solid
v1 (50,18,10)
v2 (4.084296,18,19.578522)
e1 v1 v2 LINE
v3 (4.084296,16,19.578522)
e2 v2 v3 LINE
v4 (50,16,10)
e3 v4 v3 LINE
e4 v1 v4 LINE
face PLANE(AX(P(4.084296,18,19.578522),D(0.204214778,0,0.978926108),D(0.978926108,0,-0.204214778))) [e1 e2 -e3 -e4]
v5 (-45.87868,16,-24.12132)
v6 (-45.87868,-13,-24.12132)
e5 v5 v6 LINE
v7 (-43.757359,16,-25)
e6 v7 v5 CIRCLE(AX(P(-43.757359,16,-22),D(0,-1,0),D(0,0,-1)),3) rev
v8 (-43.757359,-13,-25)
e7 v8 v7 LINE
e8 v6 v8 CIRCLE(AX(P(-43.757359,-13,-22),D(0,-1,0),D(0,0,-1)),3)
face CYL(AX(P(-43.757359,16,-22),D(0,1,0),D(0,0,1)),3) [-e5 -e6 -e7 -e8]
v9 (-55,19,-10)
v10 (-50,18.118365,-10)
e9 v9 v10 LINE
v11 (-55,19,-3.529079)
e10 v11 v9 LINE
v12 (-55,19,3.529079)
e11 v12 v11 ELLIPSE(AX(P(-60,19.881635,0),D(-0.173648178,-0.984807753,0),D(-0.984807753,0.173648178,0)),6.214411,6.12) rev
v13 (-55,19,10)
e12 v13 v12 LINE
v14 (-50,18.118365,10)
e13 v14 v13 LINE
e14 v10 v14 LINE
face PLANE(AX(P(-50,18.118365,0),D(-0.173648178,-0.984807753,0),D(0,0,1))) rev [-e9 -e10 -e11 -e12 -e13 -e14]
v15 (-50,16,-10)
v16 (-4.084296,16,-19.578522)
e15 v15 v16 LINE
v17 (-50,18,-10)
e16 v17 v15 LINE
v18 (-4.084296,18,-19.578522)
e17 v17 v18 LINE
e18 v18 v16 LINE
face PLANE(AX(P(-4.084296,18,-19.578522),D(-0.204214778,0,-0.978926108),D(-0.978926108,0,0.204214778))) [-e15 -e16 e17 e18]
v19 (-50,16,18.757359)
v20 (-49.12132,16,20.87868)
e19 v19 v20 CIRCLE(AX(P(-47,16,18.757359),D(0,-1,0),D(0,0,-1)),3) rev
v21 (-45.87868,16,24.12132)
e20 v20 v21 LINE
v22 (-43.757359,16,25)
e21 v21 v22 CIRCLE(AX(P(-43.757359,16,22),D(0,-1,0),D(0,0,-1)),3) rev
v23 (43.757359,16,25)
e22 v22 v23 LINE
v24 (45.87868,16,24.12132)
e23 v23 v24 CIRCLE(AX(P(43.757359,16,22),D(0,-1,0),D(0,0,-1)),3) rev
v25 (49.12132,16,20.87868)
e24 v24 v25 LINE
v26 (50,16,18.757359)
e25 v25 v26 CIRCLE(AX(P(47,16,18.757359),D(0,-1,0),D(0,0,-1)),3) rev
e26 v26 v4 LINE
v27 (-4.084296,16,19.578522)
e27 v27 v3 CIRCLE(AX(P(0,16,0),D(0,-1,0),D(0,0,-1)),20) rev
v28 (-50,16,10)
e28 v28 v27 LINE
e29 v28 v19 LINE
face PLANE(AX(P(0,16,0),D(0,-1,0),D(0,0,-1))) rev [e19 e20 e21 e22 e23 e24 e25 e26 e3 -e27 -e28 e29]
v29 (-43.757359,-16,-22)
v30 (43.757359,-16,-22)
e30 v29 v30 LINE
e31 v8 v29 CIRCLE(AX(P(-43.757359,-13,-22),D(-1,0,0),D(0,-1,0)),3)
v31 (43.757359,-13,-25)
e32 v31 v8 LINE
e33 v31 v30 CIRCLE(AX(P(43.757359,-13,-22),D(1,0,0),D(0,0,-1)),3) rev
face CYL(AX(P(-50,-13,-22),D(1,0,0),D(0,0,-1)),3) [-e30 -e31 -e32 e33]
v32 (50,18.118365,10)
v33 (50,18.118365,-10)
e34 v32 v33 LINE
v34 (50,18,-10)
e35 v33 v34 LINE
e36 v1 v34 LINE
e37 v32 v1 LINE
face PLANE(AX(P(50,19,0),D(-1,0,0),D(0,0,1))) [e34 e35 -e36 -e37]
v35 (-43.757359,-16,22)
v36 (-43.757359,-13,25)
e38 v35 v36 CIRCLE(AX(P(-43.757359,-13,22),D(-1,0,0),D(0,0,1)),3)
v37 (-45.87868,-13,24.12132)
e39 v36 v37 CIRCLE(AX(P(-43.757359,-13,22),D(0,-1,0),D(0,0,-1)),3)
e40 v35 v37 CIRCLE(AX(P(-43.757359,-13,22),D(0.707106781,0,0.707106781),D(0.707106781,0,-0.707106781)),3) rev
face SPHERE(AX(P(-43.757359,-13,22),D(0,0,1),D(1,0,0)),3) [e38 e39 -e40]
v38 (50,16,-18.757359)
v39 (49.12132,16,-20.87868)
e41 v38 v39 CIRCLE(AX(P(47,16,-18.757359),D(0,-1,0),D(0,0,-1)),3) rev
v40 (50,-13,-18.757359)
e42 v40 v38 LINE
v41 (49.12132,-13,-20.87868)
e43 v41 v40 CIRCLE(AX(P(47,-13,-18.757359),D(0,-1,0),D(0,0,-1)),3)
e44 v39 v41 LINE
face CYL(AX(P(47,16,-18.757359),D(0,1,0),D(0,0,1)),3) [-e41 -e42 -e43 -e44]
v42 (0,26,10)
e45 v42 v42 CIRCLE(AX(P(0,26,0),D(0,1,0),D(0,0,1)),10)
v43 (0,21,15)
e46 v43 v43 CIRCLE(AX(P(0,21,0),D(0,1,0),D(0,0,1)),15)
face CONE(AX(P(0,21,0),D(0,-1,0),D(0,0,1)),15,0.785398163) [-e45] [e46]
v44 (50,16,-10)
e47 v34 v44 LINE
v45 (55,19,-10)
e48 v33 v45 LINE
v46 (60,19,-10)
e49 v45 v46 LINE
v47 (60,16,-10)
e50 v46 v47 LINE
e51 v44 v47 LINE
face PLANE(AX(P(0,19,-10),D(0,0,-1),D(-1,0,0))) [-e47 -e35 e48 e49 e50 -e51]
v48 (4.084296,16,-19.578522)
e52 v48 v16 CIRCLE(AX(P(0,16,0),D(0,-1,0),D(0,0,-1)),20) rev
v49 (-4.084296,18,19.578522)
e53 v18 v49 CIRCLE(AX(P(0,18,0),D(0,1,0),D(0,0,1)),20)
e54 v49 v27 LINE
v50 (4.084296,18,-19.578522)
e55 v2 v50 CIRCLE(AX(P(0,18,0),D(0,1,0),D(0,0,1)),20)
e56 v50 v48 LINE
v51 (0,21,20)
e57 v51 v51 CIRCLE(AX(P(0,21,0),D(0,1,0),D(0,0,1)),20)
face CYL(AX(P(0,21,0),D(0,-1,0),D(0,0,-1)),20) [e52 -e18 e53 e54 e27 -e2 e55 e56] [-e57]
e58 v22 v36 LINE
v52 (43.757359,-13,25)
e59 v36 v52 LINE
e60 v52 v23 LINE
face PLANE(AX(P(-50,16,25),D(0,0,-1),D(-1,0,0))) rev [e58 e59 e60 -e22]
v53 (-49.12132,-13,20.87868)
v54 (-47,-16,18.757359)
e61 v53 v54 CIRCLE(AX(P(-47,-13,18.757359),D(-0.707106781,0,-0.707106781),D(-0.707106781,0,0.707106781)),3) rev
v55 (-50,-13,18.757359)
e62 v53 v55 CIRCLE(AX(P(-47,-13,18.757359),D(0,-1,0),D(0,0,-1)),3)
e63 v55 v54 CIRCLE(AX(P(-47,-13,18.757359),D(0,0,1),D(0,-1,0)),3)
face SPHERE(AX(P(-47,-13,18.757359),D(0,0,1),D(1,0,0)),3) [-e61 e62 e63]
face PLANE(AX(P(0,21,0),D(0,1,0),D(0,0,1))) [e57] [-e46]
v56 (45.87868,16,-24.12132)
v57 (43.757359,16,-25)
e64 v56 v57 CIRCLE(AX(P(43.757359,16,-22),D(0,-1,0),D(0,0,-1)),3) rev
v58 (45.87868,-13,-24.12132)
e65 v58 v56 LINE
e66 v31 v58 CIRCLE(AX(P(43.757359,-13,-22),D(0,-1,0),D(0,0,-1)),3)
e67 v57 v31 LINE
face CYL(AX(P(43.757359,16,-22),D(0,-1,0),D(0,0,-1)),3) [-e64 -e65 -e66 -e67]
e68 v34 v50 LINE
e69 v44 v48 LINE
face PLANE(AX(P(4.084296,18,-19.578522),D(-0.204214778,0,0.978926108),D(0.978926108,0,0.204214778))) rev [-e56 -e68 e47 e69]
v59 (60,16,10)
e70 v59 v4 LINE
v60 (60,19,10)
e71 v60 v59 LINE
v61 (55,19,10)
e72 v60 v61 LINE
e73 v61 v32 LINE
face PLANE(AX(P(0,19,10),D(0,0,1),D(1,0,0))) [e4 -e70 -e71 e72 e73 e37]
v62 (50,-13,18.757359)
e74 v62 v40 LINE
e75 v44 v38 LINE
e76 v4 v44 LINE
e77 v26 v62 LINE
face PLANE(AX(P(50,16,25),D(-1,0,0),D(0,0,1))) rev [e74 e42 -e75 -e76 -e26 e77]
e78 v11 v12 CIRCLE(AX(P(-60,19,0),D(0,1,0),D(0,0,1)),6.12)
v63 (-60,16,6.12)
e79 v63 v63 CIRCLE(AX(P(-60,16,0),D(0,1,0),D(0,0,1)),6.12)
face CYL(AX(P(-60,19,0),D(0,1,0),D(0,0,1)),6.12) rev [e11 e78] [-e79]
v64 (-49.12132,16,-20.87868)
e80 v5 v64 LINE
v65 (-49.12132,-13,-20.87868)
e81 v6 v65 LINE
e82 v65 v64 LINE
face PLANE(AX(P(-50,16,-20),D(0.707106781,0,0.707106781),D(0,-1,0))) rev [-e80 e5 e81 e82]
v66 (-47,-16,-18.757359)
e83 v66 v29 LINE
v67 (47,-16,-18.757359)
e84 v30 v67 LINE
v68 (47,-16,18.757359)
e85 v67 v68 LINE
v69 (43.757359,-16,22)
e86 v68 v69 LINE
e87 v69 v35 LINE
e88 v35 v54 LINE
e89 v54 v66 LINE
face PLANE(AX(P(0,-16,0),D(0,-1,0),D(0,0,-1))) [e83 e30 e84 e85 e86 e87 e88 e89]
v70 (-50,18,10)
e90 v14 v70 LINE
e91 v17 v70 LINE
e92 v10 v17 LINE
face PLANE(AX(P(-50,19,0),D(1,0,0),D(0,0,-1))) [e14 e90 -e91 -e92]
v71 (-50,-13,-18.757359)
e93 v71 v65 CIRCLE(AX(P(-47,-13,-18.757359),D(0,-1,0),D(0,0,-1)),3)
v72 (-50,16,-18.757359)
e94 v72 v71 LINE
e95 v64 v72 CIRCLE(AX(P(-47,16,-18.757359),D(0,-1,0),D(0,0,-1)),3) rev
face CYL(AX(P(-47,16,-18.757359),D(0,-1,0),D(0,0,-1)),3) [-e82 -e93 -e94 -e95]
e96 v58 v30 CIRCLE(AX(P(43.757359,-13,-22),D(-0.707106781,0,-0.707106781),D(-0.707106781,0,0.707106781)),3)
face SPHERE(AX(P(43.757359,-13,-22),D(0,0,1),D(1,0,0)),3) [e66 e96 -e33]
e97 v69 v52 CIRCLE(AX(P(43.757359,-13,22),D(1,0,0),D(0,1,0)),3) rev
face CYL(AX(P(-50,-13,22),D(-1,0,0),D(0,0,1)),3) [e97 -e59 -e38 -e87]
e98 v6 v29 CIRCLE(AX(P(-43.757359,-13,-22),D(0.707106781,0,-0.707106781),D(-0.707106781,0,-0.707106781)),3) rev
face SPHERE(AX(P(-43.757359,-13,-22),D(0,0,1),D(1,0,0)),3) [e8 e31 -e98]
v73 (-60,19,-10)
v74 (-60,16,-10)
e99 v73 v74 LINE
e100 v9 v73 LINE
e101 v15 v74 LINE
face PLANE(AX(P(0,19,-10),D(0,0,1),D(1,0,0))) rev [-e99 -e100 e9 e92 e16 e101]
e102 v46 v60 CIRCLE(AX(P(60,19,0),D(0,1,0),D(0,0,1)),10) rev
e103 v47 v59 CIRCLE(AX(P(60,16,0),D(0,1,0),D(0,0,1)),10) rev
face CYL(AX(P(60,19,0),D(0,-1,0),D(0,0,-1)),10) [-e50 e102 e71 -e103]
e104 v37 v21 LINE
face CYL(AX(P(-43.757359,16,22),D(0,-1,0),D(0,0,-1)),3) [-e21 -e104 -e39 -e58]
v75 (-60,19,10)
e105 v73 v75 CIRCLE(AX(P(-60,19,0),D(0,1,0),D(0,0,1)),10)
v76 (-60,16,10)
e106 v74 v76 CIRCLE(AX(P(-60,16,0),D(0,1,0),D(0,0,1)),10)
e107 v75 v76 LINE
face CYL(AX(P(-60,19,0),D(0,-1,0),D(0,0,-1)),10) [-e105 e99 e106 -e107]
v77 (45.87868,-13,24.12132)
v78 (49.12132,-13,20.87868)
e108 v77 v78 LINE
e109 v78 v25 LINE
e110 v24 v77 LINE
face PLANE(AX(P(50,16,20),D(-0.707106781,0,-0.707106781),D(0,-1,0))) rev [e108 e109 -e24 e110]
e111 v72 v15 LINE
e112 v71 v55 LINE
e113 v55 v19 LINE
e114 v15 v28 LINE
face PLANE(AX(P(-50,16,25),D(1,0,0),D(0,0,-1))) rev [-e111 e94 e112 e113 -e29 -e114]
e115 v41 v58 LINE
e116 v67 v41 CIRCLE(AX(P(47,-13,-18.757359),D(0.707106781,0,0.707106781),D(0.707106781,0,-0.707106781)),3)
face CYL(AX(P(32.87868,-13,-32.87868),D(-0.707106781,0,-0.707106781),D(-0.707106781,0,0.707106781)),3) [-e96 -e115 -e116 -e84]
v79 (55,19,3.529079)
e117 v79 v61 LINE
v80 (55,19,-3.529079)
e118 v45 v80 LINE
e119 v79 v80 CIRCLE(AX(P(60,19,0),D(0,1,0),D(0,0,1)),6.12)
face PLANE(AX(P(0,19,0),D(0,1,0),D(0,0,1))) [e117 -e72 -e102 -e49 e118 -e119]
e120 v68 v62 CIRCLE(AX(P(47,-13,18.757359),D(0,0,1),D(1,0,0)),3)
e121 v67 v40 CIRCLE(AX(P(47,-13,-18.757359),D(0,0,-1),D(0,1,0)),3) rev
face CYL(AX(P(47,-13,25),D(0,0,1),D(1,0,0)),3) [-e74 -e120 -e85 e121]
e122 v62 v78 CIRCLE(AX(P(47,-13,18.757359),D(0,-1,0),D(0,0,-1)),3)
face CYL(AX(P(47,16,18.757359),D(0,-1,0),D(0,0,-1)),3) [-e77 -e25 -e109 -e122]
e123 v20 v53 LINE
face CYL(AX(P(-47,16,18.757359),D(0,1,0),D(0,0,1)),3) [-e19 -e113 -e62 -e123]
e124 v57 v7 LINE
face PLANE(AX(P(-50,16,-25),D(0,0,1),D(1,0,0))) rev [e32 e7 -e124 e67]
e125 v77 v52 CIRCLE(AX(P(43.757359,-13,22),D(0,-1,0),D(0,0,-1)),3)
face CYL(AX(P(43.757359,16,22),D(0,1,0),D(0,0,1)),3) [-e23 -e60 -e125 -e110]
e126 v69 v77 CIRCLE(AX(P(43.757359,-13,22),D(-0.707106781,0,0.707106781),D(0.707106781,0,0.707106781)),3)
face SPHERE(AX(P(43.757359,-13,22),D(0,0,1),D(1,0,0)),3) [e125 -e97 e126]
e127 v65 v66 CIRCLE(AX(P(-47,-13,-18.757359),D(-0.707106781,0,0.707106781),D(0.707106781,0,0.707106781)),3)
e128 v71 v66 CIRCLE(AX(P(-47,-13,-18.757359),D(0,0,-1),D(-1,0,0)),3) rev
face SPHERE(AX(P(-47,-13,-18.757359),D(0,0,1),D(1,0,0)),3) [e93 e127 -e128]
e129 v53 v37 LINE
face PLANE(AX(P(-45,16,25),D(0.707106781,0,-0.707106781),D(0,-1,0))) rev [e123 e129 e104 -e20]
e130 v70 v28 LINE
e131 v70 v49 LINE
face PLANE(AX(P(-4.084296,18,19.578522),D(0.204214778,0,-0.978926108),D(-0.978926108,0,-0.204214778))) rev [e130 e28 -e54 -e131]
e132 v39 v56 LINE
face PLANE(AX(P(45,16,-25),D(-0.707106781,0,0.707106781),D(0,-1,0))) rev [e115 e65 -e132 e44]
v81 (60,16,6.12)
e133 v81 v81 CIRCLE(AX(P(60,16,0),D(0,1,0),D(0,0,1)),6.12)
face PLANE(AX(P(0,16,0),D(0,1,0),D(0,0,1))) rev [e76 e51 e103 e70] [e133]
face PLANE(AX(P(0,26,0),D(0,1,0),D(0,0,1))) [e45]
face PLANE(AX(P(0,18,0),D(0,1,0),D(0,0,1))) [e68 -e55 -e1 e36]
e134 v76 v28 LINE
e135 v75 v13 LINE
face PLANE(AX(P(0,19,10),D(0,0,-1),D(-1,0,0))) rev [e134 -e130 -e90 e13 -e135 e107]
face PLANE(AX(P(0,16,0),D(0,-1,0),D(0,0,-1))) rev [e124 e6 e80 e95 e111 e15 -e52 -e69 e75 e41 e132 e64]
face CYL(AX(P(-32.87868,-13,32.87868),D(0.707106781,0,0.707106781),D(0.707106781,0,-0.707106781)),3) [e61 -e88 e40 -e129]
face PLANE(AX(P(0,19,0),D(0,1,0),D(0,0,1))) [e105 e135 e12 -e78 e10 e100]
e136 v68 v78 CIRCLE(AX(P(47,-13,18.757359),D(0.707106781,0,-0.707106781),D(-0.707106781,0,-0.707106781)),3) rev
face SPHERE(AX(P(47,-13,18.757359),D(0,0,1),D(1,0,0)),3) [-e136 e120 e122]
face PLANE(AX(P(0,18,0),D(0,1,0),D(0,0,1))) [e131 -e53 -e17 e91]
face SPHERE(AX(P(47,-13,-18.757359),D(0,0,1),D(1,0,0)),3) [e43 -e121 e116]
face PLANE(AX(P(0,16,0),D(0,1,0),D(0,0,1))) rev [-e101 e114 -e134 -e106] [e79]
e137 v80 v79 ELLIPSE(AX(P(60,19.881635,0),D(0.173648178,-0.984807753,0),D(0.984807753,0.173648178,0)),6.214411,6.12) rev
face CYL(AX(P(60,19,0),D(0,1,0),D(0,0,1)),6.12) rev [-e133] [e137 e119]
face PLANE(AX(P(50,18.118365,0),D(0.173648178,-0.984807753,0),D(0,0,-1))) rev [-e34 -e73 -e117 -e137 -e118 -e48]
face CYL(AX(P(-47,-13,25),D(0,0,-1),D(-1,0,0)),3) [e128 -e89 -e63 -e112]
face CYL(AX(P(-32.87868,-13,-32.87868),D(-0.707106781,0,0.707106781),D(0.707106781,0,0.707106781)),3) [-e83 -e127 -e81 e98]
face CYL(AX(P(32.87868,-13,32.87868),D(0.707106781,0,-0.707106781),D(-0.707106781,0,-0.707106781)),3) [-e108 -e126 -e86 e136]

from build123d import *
from OCP.BRepFilletAPI import BRepFilletAPI_MakeChamfer

# Parameters (mm, degrees)
SKETCH1_W                               = 100
SKETCH1_H                               = 50
BOSS_EXTRUDE1_DEPTH                     = 16
SKETCH2_R                               = 20
BOSS_EXTRUDE2_DEPTH                     = 5
BOSS_EXTRUDE3_DEPTH                     = 2
BOSS_EXTRUDE4_DEPTH                     = 3
CHAMFER1_SIZE                           = 5
CHAMFER1_SIZE2                          = 0.881634904
SKETCH3_R                               = 15
BOSS_EXTRUDE5_DEPTH                     = 5
BOSS_EXTRUDE5_TAPER                     = 45
CBORE_FOR_M5_HEX_HEAD_BOLT1_D           = 5.3
CBORE_FOR_M5_HEX_HEAD_BOLT1_DEPTH       = 15
CBORE_FOR_M5_HEX_HEAD_BOLT1_CBORE_D     = 12.24
CBORE_FOR_M5_HEX_HEAD_BOLT1_CBORE_DEPTH = 3.58
CBORE_FOR_M5_HEX_HEAD_BOLT1_TIP         = 1.59228064
CHAMFER2_SIZE                           = 5
FILLET3_R                               = 3


# Read off the part's stored shape, not the designer's step: Boss-Extrude4
with BuildPart() as part:
    # Sketch1 → Boss-Extrude1 (new, symmetric)
    with BuildSketch(Plane(origin=(0, 0, 0), x_dir=(1, 0, 0), z_dir=(0, 1, 0))):
        Rectangle(SKETCH1_W, SKETCH1_H)
    extrude(amount=BOSS_EXTRUDE1_DEPTH, both=True)

    # Sketch2 → Boss-Extrude2 (add)
    with BuildSketch(Plane(origin=(0, 16, 0), x_dir=(1, 0, 0), z_dir=(0, 1, 0))):
        with Locations(Location((0, 0, 0), (0, 0, 90))):
            Circle(SKETCH2_R)
    extrude(amount=BOSS_EXTRUDE2_DEPTH)

    # Sketch2<3> → Boss-Extrude3 (add)
    with BuildSketch(Plane(origin=(0, 16, 0), x_dir=(1, 0, 0), z_dir=(0, 1, 0))):
        with BuildLine():
            Line((-4.084295569, 19.578522153), (-50, 10))
            Line((-50, 10), (-50, -10))
            Line((-50, -10), (-4.084295569, -19.578522153))
            ThreePointArc((-4.084295569, -19.578522153), (-20, 0), (-4.084295569, 19.578522153))
        make_face()
        with BuildLine():
            Line((50, 10), (4.084295569, 19.578522153))
            ThreePointArc((4.084295569, 19.578522153), (15.519115815, 12.615745888), (20, 0))
            ThreePointArc((20, 0), (15.519115815, -12.615745888), (4.084295569, -19.578522153))
            Line((4.084295569, -19.578522153), (50, -10))
            Line((50, -10), (50, 10))
        make_face()
    extrude(amount=BOSS_EXTRUDE3_DEPTH)

    # Boss-Extrude4 outline → Boss-Extrude4 (add)
    with BuildSketch(Plane(origin=(0, 16, 0), x_dir=(1, 0, 0), z_dir=(0, 1, 0))):
        with BuildLine():
            Line((-60, -10), (-50, -10))
            Line((-50, -10), (-50, 10))
            Line((-50, 10), (-60, 10))
            ThreePointArc((-60, 10), (-70, 0), (-60, -10))
        make_face()
        with BuildLine():
            ThreePointArc((60, -10), (70, 0), (60, 10))
            Line((60, 10), (50, 10))
            Line((50, 10), (50, -10))
            Line((50, -10), (60, -10))
        make_face()
    extrude(amount=BOSS_EXTRUDE4_DEPTH)

    # Chamfer1: one chamfer whose edges measure the first distance from different faces: ONE call of the kernel's chamfer builder (chamfer() names one face for all edges)
    chamfer1_edges_1 = [part.edges().sort_by_distance(p)[0] for p in [
        (-50, 19, 0),
    ]]
    chamfer1_side_1 = [part.faces().sort_by_distance(p)[0] for p in [
        (-59.066501411, 19, 0),
    ]]
    chamfer1_edges_2 = [part.edges().sort_by_distance(p)[0] for p in [
        (50, 19, 0),
    ]]
    chamfer1_side_2 = [part.faces().sort_by_distance(p)[0] for p in [
        (59.066501411, 19, 0),
    ]]
    chamfer1 = BRepFilletAPI_MakeChamfer(part.part.solid().wrapped)
    for e in chamfer1_edges_1:
        chamfer1.Add(CHAMFER1_SIZE, CHAMFER1_SIZE2, e.wrapped, chamfer1_side_1[0].wrapped)  # the first distance lies on this face
    for e in chamfer1_edges_2:
        chamfer1.Add(CHAMFER1_SIZE, CHAMFER1_SIZE2, e.wrapped, chamfer1_side_2[0].wrapped)  # the first distance lies on this face
    add(Compound.cast(chamfer1.Shape()), mode=Mode.REPLACE)

    # Sketch3 → Boss-Extrude5 (add)
    with BuildSketch(Plane(origin=(0, 21, 0), x_dir=(1, 0, 0), z_dir=(0, 1, 0))):
        Circle(SKETCH3_R)
    extrude(amount=BOSS_EXTRUDE5_DEPTH, taper=BOSS_EXTRUDE5_TAPER)

    # CBORE for M5 Hex Head Bolt1
    with Locations(Plane(origin=(-60, 19, 0), x_dir=(0, 0, 1), z_dir=(0, 1, 0))):
        with Locations((0, 0), (0, 120)):
            CounterBoreHole(CBORE_FOR_M5_HEX_HEAD_BOLT1_D / 2, CBORE_FOR_M5_HEX_HEAD_BOLT1_CBORE_D / 2, CBORE_FOR_M5_HEX_HEAD_BOLT1_CBORE_DEPTH, depth=CBORE_FOR_M5_HEX_HEAD_BOLT1_DEPTH)
            with Locations((0, 0, -(CBORE_FOR_M5_HEX_HEAD_BOLT1_DEPTH + CBORE_FOR_M5_HEX_HEAD_BOLT1_TIP / 2))):  # 118° drill point
                Cone(0, CBORE_FOR_M5_HEX_HEAD_BOLT1_D / 2, CBORE_FOR_M5_HEX_HEAD_BOLT1_TIP, mode=Mode.SUBTRACT)

    # Chamfer2
    chamfer2_edges = [part.edges().sort_by_distance(p)[0] for p in [
        (50, 0, 25),
        (-50, 0, 25),
        (-50, 0, -25),
        (50, 0, -25),
    ]]
    chamfer(chamfer2_edges, length=CHAMFER2_SIZE)

    # Fillet3
    fillet3_edges = [part.edges().sort_by_distance(p)[0] for p in [
        (-50, -16, 0),
        (-50, 0, 20),
        (-50, 0, -20),
        (50, -16, 0),
        (0, -16, 25),
        (0, -16, -25),
        (47.5, -16, 22.5),
        (-47.5, -16, 22.5),
        (47.5, -16, -22.5),
        (-47.5, -16, -22.5),
        (45, 0, -25),
        (-45, 0, -25),
        (50, 0, 20),
        (50, 0, -20),
        (45, 0, 25),
        (-45, 0, 25),
    ]]
    fillet(fillet3_edges, radius=FILLET3_R)


solid = part.part
